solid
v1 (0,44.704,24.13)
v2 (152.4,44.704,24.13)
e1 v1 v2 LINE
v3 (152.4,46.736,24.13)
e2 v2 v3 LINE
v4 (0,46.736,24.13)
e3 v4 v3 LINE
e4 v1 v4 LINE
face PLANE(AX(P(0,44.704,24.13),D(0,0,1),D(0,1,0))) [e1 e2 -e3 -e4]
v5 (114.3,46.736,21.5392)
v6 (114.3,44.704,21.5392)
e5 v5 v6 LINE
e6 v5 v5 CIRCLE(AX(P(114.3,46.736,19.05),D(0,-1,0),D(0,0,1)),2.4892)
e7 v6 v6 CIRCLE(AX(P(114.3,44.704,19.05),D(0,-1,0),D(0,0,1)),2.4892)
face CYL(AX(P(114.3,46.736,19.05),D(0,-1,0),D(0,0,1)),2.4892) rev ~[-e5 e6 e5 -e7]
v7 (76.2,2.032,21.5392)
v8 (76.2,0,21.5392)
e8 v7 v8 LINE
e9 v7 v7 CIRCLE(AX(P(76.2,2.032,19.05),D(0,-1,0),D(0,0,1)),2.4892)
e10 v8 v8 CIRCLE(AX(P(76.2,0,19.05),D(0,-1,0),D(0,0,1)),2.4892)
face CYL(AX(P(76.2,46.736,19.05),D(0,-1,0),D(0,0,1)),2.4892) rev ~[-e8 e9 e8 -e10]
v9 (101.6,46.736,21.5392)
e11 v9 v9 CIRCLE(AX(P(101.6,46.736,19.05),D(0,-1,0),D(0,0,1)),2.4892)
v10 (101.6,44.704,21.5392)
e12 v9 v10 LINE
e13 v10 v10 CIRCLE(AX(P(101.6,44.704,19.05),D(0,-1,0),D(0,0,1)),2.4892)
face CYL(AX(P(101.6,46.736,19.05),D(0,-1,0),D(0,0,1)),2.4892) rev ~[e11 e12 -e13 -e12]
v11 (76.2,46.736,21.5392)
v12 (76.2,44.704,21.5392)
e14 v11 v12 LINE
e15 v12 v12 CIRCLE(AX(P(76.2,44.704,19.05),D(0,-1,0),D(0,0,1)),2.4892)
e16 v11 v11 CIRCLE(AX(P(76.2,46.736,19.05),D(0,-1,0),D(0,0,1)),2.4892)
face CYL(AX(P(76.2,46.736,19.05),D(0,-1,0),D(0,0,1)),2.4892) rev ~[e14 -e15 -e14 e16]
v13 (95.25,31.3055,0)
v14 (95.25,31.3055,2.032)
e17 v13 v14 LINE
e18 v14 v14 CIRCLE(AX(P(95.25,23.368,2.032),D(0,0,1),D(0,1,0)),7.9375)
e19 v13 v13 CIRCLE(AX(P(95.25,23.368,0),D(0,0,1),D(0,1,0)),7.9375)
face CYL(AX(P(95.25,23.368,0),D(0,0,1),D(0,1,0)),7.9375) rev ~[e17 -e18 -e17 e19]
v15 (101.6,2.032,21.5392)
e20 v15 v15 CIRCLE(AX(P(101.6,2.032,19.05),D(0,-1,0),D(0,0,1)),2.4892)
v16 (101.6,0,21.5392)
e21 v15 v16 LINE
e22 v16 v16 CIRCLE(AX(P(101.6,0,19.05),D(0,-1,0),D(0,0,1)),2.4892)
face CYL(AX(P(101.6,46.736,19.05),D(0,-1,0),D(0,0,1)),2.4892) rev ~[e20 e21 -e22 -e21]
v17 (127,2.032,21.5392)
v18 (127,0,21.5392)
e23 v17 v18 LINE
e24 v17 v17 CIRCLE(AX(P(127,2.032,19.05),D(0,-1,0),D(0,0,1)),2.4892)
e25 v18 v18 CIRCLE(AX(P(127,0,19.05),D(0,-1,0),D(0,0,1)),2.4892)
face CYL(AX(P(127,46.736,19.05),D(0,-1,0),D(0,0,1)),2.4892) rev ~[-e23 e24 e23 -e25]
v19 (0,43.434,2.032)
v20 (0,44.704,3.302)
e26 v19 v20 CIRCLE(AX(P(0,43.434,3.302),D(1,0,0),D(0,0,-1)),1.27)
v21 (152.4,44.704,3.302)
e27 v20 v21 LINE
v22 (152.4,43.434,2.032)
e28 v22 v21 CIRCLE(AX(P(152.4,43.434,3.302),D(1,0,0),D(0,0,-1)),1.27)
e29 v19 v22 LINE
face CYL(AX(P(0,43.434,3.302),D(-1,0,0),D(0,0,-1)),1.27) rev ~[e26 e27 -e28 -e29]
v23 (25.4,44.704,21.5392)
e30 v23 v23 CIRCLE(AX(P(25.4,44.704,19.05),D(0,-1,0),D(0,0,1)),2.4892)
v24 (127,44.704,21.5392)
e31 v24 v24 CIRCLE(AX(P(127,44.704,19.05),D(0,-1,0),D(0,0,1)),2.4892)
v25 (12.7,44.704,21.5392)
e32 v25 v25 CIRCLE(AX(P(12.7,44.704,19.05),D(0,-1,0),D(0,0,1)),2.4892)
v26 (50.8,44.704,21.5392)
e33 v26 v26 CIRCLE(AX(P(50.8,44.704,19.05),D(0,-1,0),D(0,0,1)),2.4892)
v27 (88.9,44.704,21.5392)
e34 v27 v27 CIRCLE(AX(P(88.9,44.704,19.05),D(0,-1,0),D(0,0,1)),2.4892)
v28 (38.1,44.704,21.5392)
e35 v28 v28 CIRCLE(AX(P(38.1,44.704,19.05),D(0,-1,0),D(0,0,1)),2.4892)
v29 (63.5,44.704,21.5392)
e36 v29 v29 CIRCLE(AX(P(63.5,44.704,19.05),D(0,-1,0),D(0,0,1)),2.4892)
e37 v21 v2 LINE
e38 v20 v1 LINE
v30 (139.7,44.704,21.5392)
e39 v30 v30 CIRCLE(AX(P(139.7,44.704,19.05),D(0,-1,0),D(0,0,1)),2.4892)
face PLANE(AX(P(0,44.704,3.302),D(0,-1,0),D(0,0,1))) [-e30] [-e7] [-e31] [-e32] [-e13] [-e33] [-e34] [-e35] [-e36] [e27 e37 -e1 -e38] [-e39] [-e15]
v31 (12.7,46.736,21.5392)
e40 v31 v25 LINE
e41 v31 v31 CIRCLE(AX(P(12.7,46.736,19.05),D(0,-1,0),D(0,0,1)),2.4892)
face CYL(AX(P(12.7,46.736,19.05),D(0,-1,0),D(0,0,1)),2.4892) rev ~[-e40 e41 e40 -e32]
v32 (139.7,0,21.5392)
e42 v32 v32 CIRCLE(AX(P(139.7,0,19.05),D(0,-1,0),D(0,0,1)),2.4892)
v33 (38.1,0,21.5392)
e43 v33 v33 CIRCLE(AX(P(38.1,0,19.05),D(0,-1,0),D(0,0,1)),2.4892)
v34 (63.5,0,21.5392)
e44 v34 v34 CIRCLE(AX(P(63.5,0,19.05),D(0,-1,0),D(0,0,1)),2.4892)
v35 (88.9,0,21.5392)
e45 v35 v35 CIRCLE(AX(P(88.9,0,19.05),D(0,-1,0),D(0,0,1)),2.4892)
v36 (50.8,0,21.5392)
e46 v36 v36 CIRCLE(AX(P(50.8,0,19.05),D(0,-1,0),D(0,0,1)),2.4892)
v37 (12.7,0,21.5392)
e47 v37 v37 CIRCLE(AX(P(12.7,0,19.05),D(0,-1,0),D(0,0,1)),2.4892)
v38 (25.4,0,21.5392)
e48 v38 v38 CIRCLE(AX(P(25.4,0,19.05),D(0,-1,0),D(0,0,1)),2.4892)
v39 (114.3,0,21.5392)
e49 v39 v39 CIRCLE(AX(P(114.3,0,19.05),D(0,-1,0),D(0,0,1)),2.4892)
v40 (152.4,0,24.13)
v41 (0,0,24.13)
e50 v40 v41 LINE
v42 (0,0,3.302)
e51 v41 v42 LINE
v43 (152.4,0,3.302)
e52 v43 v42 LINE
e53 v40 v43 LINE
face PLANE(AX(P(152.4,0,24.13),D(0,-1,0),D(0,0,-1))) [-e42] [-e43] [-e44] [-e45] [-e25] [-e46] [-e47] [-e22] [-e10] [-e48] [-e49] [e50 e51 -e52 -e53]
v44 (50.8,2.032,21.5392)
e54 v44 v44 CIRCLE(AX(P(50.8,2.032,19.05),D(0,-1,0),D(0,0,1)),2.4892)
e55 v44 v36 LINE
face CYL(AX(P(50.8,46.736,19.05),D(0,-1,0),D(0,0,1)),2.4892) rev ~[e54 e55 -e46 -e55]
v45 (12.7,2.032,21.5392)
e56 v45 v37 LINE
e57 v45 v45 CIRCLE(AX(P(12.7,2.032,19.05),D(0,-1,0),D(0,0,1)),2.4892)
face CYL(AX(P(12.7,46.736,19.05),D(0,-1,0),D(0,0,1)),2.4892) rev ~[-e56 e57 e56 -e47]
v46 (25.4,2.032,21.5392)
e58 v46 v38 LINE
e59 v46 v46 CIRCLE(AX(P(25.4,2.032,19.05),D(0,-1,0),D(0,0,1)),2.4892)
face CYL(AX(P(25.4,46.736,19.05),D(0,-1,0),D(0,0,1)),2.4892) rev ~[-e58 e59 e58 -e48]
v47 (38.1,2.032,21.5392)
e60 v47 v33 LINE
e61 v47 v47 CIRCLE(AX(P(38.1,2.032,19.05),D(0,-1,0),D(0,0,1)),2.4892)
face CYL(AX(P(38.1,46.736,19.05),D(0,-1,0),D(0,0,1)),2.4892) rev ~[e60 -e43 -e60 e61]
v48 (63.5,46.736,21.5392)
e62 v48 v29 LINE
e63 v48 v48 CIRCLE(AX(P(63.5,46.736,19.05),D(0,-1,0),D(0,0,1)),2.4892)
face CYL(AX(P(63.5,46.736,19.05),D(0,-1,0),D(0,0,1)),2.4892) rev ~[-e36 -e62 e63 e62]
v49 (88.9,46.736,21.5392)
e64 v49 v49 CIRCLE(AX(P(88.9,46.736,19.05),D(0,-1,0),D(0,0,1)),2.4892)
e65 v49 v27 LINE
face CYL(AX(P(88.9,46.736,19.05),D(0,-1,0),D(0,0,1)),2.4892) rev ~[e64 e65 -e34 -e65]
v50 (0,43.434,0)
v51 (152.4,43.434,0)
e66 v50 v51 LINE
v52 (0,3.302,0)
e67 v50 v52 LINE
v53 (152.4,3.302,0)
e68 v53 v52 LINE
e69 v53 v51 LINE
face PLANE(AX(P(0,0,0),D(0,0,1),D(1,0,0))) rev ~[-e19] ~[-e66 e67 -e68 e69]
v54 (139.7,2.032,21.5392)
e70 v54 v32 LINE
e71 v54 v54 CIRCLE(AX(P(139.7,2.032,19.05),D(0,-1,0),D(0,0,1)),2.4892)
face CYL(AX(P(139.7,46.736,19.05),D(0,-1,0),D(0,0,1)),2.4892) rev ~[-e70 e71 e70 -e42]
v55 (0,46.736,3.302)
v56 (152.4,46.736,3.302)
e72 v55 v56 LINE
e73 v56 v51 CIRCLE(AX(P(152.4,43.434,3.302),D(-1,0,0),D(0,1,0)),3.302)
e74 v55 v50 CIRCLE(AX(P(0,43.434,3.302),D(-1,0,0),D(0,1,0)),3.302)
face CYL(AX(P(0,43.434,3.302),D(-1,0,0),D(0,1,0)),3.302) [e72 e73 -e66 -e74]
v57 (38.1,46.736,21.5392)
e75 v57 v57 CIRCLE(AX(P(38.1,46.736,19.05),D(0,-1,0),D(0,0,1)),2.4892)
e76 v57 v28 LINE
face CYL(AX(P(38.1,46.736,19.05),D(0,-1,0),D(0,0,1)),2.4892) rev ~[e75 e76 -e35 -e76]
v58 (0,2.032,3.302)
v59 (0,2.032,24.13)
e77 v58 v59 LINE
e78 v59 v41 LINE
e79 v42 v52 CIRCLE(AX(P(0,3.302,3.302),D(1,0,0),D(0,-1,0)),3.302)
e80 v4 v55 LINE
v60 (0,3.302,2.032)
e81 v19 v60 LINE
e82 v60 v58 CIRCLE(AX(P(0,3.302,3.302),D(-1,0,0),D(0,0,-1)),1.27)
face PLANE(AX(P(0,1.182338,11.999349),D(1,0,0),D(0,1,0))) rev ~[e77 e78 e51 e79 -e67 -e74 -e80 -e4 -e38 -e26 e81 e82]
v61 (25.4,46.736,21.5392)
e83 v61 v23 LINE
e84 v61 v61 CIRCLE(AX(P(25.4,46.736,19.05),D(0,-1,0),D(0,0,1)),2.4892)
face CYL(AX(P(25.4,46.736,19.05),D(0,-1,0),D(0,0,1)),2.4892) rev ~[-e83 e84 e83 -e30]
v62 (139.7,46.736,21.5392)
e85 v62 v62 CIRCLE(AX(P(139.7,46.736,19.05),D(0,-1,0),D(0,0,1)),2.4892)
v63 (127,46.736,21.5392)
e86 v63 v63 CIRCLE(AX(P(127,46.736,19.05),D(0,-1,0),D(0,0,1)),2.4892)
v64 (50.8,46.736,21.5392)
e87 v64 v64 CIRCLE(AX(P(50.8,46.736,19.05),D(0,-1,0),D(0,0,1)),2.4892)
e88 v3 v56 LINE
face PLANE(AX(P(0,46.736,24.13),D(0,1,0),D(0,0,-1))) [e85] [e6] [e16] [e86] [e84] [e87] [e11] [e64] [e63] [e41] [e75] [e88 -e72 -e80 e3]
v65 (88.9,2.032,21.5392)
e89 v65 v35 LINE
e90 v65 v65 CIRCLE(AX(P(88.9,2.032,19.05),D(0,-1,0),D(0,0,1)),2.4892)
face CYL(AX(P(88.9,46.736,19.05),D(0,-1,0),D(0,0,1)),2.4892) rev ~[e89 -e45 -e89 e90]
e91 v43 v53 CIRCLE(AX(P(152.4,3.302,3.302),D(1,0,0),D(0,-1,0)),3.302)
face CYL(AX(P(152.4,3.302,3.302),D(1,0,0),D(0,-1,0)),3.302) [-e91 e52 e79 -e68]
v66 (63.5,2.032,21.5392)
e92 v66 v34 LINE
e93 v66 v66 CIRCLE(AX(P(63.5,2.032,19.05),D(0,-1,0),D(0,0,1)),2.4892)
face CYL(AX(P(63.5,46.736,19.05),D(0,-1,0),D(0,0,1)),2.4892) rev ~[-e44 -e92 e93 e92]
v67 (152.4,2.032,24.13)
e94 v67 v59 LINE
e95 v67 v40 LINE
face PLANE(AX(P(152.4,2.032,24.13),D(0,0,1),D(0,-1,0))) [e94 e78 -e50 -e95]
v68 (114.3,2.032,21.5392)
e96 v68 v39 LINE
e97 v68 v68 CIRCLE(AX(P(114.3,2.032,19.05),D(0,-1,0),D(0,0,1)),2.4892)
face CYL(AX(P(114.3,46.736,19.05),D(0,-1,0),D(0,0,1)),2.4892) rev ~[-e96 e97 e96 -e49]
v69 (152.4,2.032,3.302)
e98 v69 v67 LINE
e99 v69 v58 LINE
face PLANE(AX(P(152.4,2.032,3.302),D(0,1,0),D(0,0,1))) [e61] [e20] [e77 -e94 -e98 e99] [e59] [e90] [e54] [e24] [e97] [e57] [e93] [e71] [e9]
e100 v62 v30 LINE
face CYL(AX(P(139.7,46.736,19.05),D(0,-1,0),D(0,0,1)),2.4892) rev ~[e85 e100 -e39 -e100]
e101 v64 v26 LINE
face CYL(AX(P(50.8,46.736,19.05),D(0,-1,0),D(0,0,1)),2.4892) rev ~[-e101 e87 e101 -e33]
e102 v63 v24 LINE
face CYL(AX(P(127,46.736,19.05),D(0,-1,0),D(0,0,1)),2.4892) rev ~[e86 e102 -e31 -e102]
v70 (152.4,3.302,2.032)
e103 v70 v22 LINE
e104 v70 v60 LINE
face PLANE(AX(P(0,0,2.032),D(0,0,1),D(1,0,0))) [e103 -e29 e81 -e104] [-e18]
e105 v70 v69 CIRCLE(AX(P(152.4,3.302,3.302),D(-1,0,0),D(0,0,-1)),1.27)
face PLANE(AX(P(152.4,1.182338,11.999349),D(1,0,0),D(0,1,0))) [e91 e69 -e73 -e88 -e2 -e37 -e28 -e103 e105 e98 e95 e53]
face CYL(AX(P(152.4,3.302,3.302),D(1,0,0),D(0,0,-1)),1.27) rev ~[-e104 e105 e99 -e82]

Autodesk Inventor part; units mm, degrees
ref_plane "YZ Plane" through (0, 0, 0) normal (1, 0, 0) x (0, 1, 0)
ref_plane "XZ Plane" through (0, 0, 0) normal (0, 1, 0) x (-1, 0, 0)
ref_plane "XY Plane" through (0, 0, 0) normal (0, 0, 1) x (1, 0, 0)
sketch "Sketch1" plane through (0, 0, 0) normal (0, 0, 1) x (1, 0, 0)
  line L0 (0, 0) -> (152.4, 0)
  line L1 (152.4, 0) -> (152.4, 46.736)
  line L2 (152.4, 46.736) -> (0, 46.736)
  line L3 (0, 46.736) -> (0, 0)
  dimension "d0" = 152.4
  dimension "d1" = 46.736
extrude "Plate1" add sketch "Sketch1" along normal blind 2.032
sketch "Sketch2" plane through (0, 44.704, 0) normal (0, 1, 0) x (-1, 0, 0)
  line L0 (-152.4, 0) -> (0, 0)
  line L1 (0, 0) -> (0, 24.13)
  line L2 (0, 24.13) -> (-152.4, 24.13)
  line L3 (-152.4, 24.13) -> (-152.4, 0)
edge flange "Flange1" height 24.13 angle 90 thickness 2.032 bend radius 1.27 thickness toward (0, 1, 0) relief tear relief width 2.032 relief depth 1.016 edges at (76.2, 46.736, 2.032) wall of the first edge with corners at (152.4, 44.704, 0) (0, 44.704, 0) (0, 44.704, 24.13) (152.4, 44.704, 24.13)
bend "Bend1"
corner "Corner1"
sketch "Sketch3" plane through (152.4, 2.032, 0) normal (0, -1, 0) x (1, 0, 0)
  line L0 (-152.4, 0) -> (0, 0)
  line L1 (0, 0) -> (0, 24.13)
  line L2 (0, 24.13) -> (-152.4, 24.13)
  line L3 (-152.4, 24.13) -> (-152.4, 0)
edge flange "Flange2" height 24.13 angle 90 thickness 2.032 bend radius 1.27 thickness toward (0, -1, 0) relief tear relief width 2.032 relief depth 1.016 edges at (76.2, 0, 2.032) wall of the first edge with corners at (0, 2.032, 0) (152.4, 2.032, 0) (152.4, 2.032, 24.13) (0, 2.032, 24.13)
bend "Bend2"
corner "Corner2"
sketch "Sketch4" plane through (0, 46.736, 24.13) normal (0, 1, 0) x (1, 0, 0)
  line L0 (0, 0) -> (0, 20.828) projected
  line L1 (0, 24.13) -> (152.4, 24.13) projected
  point P0 (12.7, 5.08)
  dimension "d23" = 12.7
  dimension "d24" = 19.05
hole "Hole1" at (12.7, 46.736, 19.05) direction (0, -1, 0) diameter 4.9784 end through all
pattern_linear "Rectangular Pattern1" count 11 spacing 12.7 along (1, 0, 0) of "Hole1"
sketch "Sketch5" plane through (0, 0, 0) normal (0, 0, -1) x (-1, 0, 0)
  line L0 (-152.4, 3.302) -> (-152.4, 43.434) projected
  point P0 (0, 0)
  point P1 (-95.25, 23.368)
  point P2 (-152.4, 23.368)
  dimension "d35" = 57.15
hole "Hole2" at (95.25, 23.368, 0) direction (0, 0, 1) diameter 15.875 end through all
equation "\"d30\" = Thickness"
equation "\"d41\" = Thickness"
equation "\"d2\" = Thickness"
equation "\"d3\" = BendReliefWidth"
equation "\"d4\" = BendReliefDepth"
equation "\"d5\" = MinimumRemnant"
equation "\"d6\" = TransitionRadius"
equation "\"d9\" = BendRadius"
equation "\"d10\" = CornerReliefSize"
equation "\"d11\" = GapSize"
equation "\"d12\" = JacobiRadiusSize"
equation "\"d13\" = BendReliefWidth"
equation "\"d14\" = BendReliefDepth"
equation "\"d15\" = MinimumRemnant"
equation "\"d16\" = TransitionRadius"
equation "\"d19\" = BendRadius"
equation "\"d20\" = CornerReliefSize"
equation "\"d21\" = GapSize"
equation "\"d22\" = JacobiRadiusSize"
equation "\"BendReliefWidth\" = Thickness"
equation "\"BendReliefDepth\" = 0.5 * Thickness"
equation "\"CornerReliefSize\" = 4 * Thickness"
equation "\"MinimumRemnant\" = 2 * Thickness"
equation "\"TransitionRadius\" = BendRadius"
equation "\"JacobiRadiusSize\" = BendRadius"
equation "\"GapSize\" = Thickness"
equation "\"Thickness\" = 2.032"
equation "\"BendRadius\" = 1.27"
properties part number "Side arm inner" material "Aluminum 6061"
